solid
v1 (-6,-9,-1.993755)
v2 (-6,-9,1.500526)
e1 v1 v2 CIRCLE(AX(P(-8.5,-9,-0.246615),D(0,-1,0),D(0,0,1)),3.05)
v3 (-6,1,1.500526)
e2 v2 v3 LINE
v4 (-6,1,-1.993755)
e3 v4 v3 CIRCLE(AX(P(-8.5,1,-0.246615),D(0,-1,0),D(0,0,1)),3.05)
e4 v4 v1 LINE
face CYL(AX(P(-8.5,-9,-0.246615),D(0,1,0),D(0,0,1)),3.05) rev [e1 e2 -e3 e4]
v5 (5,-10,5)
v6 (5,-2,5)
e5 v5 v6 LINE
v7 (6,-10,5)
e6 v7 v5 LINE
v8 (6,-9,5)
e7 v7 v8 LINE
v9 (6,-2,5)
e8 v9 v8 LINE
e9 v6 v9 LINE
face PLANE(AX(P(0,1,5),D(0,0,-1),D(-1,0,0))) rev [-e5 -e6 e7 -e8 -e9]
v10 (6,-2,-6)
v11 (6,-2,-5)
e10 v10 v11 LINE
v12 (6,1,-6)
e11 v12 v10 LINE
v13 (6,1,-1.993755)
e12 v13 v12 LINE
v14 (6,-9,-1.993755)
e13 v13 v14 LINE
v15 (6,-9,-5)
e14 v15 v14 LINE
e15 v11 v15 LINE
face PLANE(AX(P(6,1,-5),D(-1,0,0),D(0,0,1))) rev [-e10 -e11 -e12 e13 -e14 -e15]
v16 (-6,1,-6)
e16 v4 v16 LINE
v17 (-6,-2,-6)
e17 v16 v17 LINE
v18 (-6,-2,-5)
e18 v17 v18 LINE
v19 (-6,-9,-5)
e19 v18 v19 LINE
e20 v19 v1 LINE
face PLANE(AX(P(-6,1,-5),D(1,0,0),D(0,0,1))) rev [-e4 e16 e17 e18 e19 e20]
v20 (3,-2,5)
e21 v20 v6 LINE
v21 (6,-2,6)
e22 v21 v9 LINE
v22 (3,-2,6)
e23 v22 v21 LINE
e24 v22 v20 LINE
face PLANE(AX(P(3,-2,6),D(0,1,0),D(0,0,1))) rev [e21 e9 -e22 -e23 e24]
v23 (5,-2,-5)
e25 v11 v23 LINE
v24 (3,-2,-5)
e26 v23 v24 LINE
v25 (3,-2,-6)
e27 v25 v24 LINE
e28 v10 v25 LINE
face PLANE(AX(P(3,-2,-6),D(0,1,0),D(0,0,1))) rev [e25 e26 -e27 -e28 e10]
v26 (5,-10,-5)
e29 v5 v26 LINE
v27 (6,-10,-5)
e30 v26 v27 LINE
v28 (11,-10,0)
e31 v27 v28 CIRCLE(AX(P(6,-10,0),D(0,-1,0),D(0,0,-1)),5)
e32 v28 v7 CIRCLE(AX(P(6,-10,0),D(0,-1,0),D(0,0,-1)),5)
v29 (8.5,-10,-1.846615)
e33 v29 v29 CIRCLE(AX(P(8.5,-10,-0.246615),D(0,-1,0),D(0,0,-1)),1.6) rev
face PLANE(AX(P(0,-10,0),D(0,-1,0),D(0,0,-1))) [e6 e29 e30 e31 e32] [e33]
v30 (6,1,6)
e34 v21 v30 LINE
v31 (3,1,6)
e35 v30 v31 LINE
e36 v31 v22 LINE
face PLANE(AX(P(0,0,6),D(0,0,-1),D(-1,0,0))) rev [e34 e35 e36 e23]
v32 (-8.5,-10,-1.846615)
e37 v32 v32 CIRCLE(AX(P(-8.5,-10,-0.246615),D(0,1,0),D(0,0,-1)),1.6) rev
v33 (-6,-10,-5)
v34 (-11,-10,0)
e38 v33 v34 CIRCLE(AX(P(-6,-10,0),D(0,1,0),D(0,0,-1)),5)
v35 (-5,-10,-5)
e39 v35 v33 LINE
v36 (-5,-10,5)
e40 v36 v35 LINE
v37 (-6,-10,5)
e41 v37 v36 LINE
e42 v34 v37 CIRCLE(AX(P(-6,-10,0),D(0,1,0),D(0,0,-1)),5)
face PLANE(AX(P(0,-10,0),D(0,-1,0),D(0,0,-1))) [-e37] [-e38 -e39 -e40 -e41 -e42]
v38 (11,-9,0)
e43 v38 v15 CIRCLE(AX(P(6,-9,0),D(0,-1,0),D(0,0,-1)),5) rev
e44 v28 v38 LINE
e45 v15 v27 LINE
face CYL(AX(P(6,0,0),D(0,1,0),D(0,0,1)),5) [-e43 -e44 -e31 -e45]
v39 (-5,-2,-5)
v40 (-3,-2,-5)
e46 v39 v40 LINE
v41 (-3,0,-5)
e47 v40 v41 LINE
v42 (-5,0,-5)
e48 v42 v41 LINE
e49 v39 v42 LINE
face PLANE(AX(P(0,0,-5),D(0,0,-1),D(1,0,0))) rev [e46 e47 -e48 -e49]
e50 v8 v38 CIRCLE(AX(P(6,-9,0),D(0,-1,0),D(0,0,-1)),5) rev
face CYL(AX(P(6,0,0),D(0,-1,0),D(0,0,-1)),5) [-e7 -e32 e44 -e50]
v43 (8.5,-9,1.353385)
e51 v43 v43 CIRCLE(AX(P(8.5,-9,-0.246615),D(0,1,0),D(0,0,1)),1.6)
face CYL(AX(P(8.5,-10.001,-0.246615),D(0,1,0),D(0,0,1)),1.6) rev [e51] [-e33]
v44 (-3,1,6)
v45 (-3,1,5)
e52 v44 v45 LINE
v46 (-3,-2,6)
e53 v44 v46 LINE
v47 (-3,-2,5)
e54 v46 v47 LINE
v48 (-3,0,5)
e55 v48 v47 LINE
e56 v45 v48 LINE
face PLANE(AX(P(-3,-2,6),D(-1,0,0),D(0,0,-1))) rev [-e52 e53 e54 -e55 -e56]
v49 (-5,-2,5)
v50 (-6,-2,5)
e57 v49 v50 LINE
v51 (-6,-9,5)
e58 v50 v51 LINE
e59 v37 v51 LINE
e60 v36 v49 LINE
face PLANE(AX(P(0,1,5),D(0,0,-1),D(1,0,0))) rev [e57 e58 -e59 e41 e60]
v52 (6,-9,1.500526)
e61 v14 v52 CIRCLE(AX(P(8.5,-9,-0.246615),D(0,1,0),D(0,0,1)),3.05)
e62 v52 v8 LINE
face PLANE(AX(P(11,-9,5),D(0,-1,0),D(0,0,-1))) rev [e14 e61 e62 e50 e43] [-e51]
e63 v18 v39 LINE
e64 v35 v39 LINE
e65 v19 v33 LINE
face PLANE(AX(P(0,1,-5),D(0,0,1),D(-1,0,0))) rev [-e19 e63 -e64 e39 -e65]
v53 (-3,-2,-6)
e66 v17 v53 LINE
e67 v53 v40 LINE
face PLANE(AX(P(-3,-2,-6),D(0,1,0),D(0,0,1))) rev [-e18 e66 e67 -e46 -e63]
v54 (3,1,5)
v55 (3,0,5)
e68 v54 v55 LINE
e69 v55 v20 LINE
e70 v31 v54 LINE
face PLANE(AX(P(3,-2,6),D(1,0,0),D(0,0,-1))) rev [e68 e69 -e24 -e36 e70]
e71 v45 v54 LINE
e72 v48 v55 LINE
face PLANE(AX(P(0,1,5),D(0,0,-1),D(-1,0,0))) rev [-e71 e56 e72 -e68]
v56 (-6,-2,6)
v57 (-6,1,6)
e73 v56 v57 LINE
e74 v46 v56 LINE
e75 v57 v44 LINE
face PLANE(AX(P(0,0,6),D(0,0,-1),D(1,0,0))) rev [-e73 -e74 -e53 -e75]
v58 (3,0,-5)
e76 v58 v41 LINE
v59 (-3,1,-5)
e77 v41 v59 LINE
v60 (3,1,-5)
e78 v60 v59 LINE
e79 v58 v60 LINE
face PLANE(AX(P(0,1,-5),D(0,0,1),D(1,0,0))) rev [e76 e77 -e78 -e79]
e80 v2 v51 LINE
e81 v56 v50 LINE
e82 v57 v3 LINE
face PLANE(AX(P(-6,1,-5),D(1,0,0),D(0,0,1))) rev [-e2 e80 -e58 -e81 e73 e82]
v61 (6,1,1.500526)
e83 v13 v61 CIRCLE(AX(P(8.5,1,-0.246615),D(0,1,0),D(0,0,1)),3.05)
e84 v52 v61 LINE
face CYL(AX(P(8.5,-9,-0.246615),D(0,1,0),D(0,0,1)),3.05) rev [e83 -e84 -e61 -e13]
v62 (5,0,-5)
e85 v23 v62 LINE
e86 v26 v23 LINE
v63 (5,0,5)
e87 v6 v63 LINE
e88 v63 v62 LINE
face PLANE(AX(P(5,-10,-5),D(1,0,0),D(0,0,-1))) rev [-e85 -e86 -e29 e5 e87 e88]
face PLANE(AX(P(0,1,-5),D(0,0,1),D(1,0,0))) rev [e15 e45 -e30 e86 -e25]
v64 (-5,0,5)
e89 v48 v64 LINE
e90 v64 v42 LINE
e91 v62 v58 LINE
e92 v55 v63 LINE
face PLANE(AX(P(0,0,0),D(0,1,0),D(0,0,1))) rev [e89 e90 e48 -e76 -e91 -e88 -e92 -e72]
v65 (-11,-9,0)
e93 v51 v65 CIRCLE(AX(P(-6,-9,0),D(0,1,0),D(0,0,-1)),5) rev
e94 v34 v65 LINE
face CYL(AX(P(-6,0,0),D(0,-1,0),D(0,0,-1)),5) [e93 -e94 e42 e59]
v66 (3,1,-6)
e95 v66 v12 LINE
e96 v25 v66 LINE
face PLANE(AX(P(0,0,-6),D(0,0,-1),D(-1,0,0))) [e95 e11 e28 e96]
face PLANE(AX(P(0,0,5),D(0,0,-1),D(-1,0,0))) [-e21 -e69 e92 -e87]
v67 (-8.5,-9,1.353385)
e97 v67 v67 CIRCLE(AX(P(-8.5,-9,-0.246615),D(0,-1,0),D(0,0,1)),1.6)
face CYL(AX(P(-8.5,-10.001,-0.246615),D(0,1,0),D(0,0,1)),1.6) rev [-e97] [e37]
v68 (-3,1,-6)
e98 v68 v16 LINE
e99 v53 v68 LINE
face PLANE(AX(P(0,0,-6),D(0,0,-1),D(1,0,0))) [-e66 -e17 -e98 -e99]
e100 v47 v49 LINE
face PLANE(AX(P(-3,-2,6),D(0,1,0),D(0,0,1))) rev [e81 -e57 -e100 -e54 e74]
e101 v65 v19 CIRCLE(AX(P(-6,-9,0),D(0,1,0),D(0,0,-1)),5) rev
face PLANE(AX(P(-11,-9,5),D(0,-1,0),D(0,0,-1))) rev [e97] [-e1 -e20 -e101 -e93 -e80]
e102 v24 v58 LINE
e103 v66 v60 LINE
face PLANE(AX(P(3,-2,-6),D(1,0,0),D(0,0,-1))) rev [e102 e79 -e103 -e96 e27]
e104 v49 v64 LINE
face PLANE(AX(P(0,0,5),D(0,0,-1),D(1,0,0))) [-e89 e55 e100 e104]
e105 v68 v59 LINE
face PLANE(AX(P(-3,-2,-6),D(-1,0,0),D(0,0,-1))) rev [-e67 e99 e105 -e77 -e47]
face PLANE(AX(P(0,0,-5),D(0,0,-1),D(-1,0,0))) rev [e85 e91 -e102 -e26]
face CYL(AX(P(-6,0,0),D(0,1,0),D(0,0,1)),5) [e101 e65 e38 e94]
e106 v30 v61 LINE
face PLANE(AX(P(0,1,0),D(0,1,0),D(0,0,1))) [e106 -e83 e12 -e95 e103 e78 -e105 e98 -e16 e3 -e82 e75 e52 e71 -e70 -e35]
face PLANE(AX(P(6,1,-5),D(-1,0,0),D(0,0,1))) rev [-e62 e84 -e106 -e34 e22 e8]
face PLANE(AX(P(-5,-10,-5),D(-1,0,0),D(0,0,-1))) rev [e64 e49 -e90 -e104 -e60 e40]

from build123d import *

# Parameters (mm, degrees)
SKETCH1_W           = 6
SKETCH1_H           = 10
BOSS_EXTRUDE1_DEPTH = 1
SKETCH2_W           = 1
SKETCH2_H           = 10
BOSS_EXTRUDE2_DEPTH = 10
SKETCH3_W           = 10
SKETCH3_H           = 1
BOSS_EXTRUDE3_DEPTH = 5
CUT_EXTRUDE1_REACH  = 17.684
SKETCH4_R           = 1.6
CUT_EXTRUDE6_START  = -10
SKETCH5_R           = 3.05
CUT_EXTRUDE6_DEPTH  = 10
SKETCH6_W           = 3
SKETCH6_H           = 3
BOSS_EXTRUDE4_DEPTH = 1
SKETCH7_W           = 3
SKETCH7_H           = 3
BOSS_EXTRUDE5_DEPTH = 1
FILLET2_R           = 5


with BuildPart() as part:
    # Sketch1 → Boss-Extrude1 (new body)
    with BuildSketch(Plane(origin=(0, 0, 0), x_dir=(1, 0, 0), z_dir=(0, 1, 0))):
        with Locations((3, 0)):
            Rectangle(SKETCH1_W, SKETCH1_H)
    extrude(amount=BOSS_EXTRUDE1_DEPTH)

    # Sketch2 → Boss-Extrude2 (add)
    with BuildSketch(Plane.XZ):
        with Locations((5.5, 0)):
            Rectangle(SKETCH2_W, SKETCH2_H)
    extrude(amount=BOSS_EXTRUDE2_DEPTH)

    # Sketch3 → Boss-Extrude3 (add)
    with BuildSketch(Plane(origin=(6, 0, 0), x_dir=(0, 0, -1), z_dir=(1, 0, 0))):
        with Locations((0, -9.5)):
            Rectangle(SKETCH3_W, SKETCH3_H)
    extrude(amount=BOSS_EXTRUDE3_DEPTH)

    # Sketch4 → Cut-Extrude1 (cut, up to next)
    with BuildSketch(Plane(origin=(0, -9, 0), x_dir=(1, 0, 0), z_dir=(0, 1, 0)), mode=Mode.PRIVATE) as cut_extrude1_sk1:
        with Locations(Location((8.5, 0.246614642, 0), (0, 0, 270))):
            Circle(SKETCH4_R)
    cut_extrude1_tool1 = extrude(cut_extrude1_sk1.sketch, amount=-CUT_EXTRUDE1_REACH, mode=Mode.PRIVATE) & part.part
    add(cut_extrude1_tool1.solids().sort_by_distance((8.5, -9, -0.246615))[0], mode=Mode.SUBTRACT)

    # Sketch5 → Cut-Extrude6 (cut)
    with BuildSketch(Plane(origin=(0, 1, 0), x_dir=(1, 0, 0), z_dir=(0, 1, 0)).offset(CUT_EXTRUDE6_START)):
        with Locations((8.5, 0.246614642)):
            Circle(SKETCH5_R)
    extrude(amount=CUT_EXTRUDE6_DEPTH, mode=Mode.SUBTRACT)

    # Sketch6 → Boss-Extrude4 (add)
    with BuildSketch(Plane(origin=(0, 0, -5), x_dir=(-1, 0, 0), z_dir=(0, 0, -1))):
        with Locations((-4.5, -0.5)):
            Rectangle(SKETCH6_W, SKETCH6_H)
    extrude(amount=BOSS_EXTRUDE4_DEPTH)

    # Sketch7 → Boss-Extrude5 (add)
    with BuildSketch(Plane.XY.offset(5)):
        with Locations((4.5, -0.5)):
            Rectangle(SKETCH7_W, SKETCH7_H)
    extrude(amount=BOSS_EXTRUDE5_DEPTH)

    # Fillet2
    fillet2_edges = [part.edges().sort_by_distance(p)[0] for p in [
        (11, -9.5, 5),
        (11, -9.5, -5),
    ]]
    fillet(fillet2_edges, radius=FILLET2_R - 0.0001)  # a hair under: the kernel refuses the full size

    # Mirror1: part across plane


with BuildPart() as part_1:
    add(part.part)
    add(part.part.mirror(Plane(origin=(0, 0, 0), x_dir=(0, 0, 1), z_dir=(1, 0, 0))))


solid = part_1.part
